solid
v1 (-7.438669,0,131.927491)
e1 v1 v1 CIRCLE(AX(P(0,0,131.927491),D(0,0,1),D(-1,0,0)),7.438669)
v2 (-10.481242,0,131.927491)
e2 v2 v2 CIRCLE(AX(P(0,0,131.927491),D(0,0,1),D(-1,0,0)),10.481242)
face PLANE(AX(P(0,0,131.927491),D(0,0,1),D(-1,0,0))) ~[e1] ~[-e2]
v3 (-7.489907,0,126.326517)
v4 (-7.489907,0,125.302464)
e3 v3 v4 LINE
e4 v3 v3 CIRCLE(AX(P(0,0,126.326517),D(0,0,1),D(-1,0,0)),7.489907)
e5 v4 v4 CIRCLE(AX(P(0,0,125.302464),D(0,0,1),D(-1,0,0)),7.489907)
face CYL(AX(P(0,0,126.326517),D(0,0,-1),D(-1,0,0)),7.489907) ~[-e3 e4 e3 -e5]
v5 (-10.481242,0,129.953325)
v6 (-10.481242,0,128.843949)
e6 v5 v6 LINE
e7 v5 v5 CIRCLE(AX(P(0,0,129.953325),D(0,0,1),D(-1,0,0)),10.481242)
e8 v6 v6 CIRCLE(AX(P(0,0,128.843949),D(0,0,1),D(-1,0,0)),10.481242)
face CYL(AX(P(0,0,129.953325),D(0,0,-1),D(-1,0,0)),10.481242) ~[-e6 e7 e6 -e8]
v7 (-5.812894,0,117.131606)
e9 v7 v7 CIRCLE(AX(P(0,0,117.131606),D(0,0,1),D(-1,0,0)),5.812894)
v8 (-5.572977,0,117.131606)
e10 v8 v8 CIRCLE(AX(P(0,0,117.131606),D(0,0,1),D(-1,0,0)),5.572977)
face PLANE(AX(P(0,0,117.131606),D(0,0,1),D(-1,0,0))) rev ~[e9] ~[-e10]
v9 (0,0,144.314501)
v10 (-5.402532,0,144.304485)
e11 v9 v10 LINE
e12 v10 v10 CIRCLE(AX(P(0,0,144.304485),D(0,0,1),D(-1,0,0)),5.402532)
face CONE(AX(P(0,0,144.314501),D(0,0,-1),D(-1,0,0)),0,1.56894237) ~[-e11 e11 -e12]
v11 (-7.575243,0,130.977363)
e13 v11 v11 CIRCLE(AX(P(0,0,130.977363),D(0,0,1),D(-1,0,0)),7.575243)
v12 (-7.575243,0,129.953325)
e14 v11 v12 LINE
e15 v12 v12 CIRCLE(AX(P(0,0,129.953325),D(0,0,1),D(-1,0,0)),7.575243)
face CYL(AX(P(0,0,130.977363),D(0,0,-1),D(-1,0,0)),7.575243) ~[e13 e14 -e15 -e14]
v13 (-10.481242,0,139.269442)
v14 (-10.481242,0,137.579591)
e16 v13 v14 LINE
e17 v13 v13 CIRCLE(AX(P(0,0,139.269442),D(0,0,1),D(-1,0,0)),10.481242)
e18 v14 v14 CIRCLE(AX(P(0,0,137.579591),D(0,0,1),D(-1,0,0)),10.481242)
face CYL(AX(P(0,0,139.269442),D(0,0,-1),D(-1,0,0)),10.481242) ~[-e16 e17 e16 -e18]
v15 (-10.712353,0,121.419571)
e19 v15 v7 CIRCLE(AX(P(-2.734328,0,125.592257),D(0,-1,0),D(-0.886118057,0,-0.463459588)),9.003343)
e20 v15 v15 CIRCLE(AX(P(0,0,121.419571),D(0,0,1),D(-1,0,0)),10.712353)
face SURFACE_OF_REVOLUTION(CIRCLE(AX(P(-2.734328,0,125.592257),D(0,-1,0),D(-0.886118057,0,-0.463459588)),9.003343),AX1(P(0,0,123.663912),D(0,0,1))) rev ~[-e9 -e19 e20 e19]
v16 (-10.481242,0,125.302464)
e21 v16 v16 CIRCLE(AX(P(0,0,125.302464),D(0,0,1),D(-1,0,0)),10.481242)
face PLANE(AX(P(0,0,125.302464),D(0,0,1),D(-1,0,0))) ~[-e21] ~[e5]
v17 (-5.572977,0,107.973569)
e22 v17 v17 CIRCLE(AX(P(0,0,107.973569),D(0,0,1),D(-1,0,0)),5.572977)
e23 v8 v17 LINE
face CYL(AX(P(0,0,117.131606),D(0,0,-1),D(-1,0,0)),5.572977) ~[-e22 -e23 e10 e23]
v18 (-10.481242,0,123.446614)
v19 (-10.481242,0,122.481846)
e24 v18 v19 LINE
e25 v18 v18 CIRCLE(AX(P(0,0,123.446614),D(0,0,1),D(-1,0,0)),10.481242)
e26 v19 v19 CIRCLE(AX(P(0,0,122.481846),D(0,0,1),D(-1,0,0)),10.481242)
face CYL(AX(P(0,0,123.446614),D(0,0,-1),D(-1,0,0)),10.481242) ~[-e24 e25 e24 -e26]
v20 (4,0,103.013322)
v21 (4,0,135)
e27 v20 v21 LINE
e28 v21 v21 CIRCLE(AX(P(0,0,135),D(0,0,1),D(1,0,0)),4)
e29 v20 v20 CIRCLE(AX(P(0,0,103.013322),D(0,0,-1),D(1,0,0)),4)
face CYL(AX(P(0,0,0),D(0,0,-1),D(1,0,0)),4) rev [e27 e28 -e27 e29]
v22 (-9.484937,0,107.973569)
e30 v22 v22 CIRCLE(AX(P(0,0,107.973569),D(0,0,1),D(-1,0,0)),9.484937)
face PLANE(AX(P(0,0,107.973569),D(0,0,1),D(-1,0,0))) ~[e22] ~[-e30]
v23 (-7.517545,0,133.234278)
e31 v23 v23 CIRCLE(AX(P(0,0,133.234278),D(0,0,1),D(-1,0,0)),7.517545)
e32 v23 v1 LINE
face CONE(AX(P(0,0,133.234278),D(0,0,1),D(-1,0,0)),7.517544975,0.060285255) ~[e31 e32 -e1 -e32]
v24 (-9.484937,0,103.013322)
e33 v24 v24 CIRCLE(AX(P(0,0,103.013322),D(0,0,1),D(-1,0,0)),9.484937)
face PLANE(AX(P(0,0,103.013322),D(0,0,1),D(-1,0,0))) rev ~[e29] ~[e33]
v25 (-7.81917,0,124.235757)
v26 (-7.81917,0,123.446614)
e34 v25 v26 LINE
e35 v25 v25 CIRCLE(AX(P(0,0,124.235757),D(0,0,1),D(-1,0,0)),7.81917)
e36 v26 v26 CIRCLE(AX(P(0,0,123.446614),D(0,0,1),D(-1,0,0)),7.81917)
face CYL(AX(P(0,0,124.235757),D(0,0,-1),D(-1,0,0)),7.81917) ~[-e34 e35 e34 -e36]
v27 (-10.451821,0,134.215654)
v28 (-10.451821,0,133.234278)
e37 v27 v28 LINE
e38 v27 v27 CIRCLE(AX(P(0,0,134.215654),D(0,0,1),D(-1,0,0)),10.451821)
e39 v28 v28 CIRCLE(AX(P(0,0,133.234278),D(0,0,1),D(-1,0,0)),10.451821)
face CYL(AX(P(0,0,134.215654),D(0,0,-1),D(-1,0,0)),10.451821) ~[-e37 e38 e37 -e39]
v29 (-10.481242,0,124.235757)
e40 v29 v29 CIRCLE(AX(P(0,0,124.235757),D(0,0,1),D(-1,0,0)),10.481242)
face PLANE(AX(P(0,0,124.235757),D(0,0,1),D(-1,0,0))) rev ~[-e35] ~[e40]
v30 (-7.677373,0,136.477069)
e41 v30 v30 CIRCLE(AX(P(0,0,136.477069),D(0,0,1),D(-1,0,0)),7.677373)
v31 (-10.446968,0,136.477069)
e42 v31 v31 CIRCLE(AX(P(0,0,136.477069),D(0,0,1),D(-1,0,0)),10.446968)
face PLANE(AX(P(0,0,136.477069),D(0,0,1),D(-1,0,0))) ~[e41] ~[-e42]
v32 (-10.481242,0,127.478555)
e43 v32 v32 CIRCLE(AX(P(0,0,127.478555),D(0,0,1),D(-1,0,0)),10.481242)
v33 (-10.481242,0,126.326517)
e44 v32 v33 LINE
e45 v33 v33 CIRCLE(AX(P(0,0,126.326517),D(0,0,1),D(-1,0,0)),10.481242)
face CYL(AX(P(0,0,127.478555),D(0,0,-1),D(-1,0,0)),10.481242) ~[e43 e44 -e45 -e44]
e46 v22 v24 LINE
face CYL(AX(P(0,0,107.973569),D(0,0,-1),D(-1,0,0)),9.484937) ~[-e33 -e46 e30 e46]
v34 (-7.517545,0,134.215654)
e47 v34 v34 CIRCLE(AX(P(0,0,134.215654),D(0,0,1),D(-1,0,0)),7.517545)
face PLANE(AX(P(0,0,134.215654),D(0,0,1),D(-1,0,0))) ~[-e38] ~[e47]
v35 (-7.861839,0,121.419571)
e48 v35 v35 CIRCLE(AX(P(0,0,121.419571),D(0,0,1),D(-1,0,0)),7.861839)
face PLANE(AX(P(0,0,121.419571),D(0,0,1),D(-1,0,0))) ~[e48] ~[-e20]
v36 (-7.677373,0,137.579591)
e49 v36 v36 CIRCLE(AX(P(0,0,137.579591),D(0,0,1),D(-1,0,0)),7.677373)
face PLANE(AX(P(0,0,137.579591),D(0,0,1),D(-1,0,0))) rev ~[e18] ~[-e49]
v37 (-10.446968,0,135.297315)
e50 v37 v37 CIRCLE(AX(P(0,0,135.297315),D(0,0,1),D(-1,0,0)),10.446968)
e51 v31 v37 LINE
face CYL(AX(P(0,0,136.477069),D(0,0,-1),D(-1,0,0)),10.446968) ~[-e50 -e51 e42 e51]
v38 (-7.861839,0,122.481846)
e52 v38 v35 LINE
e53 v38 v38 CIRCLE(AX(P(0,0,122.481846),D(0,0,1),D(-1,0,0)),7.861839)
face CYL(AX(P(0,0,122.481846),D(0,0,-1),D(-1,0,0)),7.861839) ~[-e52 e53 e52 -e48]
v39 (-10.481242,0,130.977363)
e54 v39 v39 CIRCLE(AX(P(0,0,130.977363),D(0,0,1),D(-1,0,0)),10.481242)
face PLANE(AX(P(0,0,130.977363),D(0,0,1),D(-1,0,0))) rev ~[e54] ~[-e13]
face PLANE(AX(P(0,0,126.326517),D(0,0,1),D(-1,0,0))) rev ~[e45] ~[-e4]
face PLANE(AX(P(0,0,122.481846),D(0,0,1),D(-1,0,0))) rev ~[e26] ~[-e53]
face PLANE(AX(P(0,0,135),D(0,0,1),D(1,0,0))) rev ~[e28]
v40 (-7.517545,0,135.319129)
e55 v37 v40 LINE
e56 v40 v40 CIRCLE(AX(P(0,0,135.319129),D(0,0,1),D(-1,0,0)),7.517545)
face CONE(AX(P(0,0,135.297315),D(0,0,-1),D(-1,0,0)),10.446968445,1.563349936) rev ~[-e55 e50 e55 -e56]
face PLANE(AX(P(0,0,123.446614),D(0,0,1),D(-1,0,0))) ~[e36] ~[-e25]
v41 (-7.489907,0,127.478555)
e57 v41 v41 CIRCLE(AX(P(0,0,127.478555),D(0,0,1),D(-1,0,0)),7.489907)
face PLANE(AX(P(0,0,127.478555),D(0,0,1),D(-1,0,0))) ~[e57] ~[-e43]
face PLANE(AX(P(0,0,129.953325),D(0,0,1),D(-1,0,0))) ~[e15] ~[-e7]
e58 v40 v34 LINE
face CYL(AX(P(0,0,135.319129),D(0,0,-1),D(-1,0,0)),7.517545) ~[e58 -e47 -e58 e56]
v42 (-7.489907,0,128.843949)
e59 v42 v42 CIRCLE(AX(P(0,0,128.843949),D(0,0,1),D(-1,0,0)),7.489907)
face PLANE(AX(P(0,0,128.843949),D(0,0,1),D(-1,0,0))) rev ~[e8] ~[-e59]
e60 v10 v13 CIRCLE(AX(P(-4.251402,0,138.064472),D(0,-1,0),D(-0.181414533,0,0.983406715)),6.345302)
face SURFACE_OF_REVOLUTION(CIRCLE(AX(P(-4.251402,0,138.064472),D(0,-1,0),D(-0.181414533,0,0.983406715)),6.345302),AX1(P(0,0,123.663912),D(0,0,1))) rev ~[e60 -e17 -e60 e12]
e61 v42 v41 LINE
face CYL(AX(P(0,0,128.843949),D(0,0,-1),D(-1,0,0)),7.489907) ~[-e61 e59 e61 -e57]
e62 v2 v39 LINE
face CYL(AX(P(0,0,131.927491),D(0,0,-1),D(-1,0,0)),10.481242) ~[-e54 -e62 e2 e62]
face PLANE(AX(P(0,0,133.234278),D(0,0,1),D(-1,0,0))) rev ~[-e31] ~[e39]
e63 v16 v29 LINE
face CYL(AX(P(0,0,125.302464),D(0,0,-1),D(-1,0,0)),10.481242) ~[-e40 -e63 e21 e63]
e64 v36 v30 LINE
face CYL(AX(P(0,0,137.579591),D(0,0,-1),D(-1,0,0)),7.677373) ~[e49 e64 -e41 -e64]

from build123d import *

# Parameters (mm, degrees)
F0_R     = 4
F1_DEPTH = 135


# Not quite as in the source:
# - a feature names something its author has since deleted; it is built from what else it names


with BuildPart() as f1:
    # F0 (on Top) → F1 (new body)
    with BuildSketch(Plane.XY):
        Circle(F0_R)
    extrude(amount=F1_DEPTH)


with BuildPart() as f3:
    # F2 (on Front) → F3 (revolve)
    with BuildSketch(Plane.XZ):
        with BuildLine():
            ThreePointArc((-5.4025318968, 144.3044847424), (-8.7187941889, 142.570608457), (-10.4812420468, 139.2694419797))
            Line((-10.4812420468, 139.2694419797), (-10.4812420468, 137.5795906956))
            Line((-10.4812420468, 137.5795906956), (-7.6773734327, 137.5795906956))
            Line((-7.6773734327, 137.5795906956), (-7.6773734327, 136.4770686801))
            Line((-7.6773734327, 136.4770686801), (-10.4469684447, 136.4770686801))
            Line((-10.4469684447, 136.4770686801), (-10.4469684447, 135.2973152099))
            Line((-10.4469684447, 135.2973152099), (-7.5175449747, 135.319129246))
            Line((-7.5175449747, 135.319129246), (-7.5175449747, 134.2156535561))
            Line((-7.5175449747, 134.2156535561), (-10.4518206354, 134.2156535561))
            Line((-10.4518206354, 134.2156535561), (-10.4518206354, 133.2342779811))
            Line((-10.4518206354, 133.2342779811), (-7.5175449747, 133.2342779811))
            Line((-7.5175449747, 133.2342779811), (-7.4386694032, 131.9274908478))
            Line((-7.4386694032, 131.9274908478), (-10.4812420468, 131.9274908478))
            Line((-10.4812420468, 131.9274908478), (-10.4812420468, 130.9773630078))
            Line((-10.4812420468, 130.9773630078), (-7.5752432022, 130.9773630078))
            Line((-7.5752432022, 130.9773630078), (-7.5752432022, 129.9533254082))
            Line((-7.5752432022, 129.9533254082), (-10.4812420468, 129.9533254082))
            Line((-10.4812420468, 129.9533254082), (-10.4812420468, 128.8439488585))
            Line((-10.4812420468, 128.8439488585), (-7.4899065803, 128.8439488585))
            Line((-7.4899065803, 128.8439488585), (-7.4899065803, 127.4785554583))
            Line((-7.4899065803, 127.4785554583), (-10.4812420468, 127.4785554583))
            Line((-10.4812420468, 127.4785554583), (-10.4812420468, 126.3265168841))
            Line((-10.4812420468, 126.3265168841), (-7.4899065803, 126.3265168841))
            Line((-7.4899065803, 126.3265168841), (-7.4899065803, 125.3024643834))
            Line((-7.4899065803, 125.3024643834), (-10.4812420468, 125.3024643834))
            Line((-10.4812420468, 125.3024643834), (-10.4812420468, 124.2357573087))
            Line((-10.4812420468, 124.2357573087), (-7.8191701323, 124.2357573087))
            Line((-7.8191701323, 124.2357573087), (-7.8191701323, 123.4466135502))
            Line((-7.8191701323, 123.4466135502), (-10.4812420468, 123.4466135502))
            Line((-10.4812420468, 123.4466135502), (-10.4812420468, 122.4818459327))
            Line((-10.4812420468, 122.4818459327), (-7.861838676, 122.4818459327))
            Line((-7.861838676, 122.4818459327), (-7.861838676, 121.4195713401))
            Line((-7.861838676, 121.4195713401), (-10.7123531493, 121.4195713401))
            ThreePointArc((-10.7123531493, 121.4195713401), (-8.6638063846, 118.8171942191), (-5.8128938955, 117.1316057444))
            Line((-5.8128938955, 117.1316057444), (-5.5729771993, 117.1316057444))
            Line((-5.5729771993, 117.1316057444), (-5.5729771993, 107.9735688748))
            Line((-5.5729771993, 107.9735688748), (-9.4849373709, 107.9735688748))
            Line((-9.4849373709, 107.9735688748), (-9.4849373709, 103.0133224906))
            Line((-9.4849373709, 103.0133224906), (0, 103.0133224906))
            Line((0, 103.0133224906), (0, 144.3145008144))
            Line((0, 144.3145008144), (-5.4025318968, 144.3044847424))
        make_face()
    revolve(axis=Axis((0, 0, 123.6639116525), (0, 0, 1)))

    # F4: cut F1
    add(f1.part, mode=Mode.SUBTRACT)


solid = f3.part
